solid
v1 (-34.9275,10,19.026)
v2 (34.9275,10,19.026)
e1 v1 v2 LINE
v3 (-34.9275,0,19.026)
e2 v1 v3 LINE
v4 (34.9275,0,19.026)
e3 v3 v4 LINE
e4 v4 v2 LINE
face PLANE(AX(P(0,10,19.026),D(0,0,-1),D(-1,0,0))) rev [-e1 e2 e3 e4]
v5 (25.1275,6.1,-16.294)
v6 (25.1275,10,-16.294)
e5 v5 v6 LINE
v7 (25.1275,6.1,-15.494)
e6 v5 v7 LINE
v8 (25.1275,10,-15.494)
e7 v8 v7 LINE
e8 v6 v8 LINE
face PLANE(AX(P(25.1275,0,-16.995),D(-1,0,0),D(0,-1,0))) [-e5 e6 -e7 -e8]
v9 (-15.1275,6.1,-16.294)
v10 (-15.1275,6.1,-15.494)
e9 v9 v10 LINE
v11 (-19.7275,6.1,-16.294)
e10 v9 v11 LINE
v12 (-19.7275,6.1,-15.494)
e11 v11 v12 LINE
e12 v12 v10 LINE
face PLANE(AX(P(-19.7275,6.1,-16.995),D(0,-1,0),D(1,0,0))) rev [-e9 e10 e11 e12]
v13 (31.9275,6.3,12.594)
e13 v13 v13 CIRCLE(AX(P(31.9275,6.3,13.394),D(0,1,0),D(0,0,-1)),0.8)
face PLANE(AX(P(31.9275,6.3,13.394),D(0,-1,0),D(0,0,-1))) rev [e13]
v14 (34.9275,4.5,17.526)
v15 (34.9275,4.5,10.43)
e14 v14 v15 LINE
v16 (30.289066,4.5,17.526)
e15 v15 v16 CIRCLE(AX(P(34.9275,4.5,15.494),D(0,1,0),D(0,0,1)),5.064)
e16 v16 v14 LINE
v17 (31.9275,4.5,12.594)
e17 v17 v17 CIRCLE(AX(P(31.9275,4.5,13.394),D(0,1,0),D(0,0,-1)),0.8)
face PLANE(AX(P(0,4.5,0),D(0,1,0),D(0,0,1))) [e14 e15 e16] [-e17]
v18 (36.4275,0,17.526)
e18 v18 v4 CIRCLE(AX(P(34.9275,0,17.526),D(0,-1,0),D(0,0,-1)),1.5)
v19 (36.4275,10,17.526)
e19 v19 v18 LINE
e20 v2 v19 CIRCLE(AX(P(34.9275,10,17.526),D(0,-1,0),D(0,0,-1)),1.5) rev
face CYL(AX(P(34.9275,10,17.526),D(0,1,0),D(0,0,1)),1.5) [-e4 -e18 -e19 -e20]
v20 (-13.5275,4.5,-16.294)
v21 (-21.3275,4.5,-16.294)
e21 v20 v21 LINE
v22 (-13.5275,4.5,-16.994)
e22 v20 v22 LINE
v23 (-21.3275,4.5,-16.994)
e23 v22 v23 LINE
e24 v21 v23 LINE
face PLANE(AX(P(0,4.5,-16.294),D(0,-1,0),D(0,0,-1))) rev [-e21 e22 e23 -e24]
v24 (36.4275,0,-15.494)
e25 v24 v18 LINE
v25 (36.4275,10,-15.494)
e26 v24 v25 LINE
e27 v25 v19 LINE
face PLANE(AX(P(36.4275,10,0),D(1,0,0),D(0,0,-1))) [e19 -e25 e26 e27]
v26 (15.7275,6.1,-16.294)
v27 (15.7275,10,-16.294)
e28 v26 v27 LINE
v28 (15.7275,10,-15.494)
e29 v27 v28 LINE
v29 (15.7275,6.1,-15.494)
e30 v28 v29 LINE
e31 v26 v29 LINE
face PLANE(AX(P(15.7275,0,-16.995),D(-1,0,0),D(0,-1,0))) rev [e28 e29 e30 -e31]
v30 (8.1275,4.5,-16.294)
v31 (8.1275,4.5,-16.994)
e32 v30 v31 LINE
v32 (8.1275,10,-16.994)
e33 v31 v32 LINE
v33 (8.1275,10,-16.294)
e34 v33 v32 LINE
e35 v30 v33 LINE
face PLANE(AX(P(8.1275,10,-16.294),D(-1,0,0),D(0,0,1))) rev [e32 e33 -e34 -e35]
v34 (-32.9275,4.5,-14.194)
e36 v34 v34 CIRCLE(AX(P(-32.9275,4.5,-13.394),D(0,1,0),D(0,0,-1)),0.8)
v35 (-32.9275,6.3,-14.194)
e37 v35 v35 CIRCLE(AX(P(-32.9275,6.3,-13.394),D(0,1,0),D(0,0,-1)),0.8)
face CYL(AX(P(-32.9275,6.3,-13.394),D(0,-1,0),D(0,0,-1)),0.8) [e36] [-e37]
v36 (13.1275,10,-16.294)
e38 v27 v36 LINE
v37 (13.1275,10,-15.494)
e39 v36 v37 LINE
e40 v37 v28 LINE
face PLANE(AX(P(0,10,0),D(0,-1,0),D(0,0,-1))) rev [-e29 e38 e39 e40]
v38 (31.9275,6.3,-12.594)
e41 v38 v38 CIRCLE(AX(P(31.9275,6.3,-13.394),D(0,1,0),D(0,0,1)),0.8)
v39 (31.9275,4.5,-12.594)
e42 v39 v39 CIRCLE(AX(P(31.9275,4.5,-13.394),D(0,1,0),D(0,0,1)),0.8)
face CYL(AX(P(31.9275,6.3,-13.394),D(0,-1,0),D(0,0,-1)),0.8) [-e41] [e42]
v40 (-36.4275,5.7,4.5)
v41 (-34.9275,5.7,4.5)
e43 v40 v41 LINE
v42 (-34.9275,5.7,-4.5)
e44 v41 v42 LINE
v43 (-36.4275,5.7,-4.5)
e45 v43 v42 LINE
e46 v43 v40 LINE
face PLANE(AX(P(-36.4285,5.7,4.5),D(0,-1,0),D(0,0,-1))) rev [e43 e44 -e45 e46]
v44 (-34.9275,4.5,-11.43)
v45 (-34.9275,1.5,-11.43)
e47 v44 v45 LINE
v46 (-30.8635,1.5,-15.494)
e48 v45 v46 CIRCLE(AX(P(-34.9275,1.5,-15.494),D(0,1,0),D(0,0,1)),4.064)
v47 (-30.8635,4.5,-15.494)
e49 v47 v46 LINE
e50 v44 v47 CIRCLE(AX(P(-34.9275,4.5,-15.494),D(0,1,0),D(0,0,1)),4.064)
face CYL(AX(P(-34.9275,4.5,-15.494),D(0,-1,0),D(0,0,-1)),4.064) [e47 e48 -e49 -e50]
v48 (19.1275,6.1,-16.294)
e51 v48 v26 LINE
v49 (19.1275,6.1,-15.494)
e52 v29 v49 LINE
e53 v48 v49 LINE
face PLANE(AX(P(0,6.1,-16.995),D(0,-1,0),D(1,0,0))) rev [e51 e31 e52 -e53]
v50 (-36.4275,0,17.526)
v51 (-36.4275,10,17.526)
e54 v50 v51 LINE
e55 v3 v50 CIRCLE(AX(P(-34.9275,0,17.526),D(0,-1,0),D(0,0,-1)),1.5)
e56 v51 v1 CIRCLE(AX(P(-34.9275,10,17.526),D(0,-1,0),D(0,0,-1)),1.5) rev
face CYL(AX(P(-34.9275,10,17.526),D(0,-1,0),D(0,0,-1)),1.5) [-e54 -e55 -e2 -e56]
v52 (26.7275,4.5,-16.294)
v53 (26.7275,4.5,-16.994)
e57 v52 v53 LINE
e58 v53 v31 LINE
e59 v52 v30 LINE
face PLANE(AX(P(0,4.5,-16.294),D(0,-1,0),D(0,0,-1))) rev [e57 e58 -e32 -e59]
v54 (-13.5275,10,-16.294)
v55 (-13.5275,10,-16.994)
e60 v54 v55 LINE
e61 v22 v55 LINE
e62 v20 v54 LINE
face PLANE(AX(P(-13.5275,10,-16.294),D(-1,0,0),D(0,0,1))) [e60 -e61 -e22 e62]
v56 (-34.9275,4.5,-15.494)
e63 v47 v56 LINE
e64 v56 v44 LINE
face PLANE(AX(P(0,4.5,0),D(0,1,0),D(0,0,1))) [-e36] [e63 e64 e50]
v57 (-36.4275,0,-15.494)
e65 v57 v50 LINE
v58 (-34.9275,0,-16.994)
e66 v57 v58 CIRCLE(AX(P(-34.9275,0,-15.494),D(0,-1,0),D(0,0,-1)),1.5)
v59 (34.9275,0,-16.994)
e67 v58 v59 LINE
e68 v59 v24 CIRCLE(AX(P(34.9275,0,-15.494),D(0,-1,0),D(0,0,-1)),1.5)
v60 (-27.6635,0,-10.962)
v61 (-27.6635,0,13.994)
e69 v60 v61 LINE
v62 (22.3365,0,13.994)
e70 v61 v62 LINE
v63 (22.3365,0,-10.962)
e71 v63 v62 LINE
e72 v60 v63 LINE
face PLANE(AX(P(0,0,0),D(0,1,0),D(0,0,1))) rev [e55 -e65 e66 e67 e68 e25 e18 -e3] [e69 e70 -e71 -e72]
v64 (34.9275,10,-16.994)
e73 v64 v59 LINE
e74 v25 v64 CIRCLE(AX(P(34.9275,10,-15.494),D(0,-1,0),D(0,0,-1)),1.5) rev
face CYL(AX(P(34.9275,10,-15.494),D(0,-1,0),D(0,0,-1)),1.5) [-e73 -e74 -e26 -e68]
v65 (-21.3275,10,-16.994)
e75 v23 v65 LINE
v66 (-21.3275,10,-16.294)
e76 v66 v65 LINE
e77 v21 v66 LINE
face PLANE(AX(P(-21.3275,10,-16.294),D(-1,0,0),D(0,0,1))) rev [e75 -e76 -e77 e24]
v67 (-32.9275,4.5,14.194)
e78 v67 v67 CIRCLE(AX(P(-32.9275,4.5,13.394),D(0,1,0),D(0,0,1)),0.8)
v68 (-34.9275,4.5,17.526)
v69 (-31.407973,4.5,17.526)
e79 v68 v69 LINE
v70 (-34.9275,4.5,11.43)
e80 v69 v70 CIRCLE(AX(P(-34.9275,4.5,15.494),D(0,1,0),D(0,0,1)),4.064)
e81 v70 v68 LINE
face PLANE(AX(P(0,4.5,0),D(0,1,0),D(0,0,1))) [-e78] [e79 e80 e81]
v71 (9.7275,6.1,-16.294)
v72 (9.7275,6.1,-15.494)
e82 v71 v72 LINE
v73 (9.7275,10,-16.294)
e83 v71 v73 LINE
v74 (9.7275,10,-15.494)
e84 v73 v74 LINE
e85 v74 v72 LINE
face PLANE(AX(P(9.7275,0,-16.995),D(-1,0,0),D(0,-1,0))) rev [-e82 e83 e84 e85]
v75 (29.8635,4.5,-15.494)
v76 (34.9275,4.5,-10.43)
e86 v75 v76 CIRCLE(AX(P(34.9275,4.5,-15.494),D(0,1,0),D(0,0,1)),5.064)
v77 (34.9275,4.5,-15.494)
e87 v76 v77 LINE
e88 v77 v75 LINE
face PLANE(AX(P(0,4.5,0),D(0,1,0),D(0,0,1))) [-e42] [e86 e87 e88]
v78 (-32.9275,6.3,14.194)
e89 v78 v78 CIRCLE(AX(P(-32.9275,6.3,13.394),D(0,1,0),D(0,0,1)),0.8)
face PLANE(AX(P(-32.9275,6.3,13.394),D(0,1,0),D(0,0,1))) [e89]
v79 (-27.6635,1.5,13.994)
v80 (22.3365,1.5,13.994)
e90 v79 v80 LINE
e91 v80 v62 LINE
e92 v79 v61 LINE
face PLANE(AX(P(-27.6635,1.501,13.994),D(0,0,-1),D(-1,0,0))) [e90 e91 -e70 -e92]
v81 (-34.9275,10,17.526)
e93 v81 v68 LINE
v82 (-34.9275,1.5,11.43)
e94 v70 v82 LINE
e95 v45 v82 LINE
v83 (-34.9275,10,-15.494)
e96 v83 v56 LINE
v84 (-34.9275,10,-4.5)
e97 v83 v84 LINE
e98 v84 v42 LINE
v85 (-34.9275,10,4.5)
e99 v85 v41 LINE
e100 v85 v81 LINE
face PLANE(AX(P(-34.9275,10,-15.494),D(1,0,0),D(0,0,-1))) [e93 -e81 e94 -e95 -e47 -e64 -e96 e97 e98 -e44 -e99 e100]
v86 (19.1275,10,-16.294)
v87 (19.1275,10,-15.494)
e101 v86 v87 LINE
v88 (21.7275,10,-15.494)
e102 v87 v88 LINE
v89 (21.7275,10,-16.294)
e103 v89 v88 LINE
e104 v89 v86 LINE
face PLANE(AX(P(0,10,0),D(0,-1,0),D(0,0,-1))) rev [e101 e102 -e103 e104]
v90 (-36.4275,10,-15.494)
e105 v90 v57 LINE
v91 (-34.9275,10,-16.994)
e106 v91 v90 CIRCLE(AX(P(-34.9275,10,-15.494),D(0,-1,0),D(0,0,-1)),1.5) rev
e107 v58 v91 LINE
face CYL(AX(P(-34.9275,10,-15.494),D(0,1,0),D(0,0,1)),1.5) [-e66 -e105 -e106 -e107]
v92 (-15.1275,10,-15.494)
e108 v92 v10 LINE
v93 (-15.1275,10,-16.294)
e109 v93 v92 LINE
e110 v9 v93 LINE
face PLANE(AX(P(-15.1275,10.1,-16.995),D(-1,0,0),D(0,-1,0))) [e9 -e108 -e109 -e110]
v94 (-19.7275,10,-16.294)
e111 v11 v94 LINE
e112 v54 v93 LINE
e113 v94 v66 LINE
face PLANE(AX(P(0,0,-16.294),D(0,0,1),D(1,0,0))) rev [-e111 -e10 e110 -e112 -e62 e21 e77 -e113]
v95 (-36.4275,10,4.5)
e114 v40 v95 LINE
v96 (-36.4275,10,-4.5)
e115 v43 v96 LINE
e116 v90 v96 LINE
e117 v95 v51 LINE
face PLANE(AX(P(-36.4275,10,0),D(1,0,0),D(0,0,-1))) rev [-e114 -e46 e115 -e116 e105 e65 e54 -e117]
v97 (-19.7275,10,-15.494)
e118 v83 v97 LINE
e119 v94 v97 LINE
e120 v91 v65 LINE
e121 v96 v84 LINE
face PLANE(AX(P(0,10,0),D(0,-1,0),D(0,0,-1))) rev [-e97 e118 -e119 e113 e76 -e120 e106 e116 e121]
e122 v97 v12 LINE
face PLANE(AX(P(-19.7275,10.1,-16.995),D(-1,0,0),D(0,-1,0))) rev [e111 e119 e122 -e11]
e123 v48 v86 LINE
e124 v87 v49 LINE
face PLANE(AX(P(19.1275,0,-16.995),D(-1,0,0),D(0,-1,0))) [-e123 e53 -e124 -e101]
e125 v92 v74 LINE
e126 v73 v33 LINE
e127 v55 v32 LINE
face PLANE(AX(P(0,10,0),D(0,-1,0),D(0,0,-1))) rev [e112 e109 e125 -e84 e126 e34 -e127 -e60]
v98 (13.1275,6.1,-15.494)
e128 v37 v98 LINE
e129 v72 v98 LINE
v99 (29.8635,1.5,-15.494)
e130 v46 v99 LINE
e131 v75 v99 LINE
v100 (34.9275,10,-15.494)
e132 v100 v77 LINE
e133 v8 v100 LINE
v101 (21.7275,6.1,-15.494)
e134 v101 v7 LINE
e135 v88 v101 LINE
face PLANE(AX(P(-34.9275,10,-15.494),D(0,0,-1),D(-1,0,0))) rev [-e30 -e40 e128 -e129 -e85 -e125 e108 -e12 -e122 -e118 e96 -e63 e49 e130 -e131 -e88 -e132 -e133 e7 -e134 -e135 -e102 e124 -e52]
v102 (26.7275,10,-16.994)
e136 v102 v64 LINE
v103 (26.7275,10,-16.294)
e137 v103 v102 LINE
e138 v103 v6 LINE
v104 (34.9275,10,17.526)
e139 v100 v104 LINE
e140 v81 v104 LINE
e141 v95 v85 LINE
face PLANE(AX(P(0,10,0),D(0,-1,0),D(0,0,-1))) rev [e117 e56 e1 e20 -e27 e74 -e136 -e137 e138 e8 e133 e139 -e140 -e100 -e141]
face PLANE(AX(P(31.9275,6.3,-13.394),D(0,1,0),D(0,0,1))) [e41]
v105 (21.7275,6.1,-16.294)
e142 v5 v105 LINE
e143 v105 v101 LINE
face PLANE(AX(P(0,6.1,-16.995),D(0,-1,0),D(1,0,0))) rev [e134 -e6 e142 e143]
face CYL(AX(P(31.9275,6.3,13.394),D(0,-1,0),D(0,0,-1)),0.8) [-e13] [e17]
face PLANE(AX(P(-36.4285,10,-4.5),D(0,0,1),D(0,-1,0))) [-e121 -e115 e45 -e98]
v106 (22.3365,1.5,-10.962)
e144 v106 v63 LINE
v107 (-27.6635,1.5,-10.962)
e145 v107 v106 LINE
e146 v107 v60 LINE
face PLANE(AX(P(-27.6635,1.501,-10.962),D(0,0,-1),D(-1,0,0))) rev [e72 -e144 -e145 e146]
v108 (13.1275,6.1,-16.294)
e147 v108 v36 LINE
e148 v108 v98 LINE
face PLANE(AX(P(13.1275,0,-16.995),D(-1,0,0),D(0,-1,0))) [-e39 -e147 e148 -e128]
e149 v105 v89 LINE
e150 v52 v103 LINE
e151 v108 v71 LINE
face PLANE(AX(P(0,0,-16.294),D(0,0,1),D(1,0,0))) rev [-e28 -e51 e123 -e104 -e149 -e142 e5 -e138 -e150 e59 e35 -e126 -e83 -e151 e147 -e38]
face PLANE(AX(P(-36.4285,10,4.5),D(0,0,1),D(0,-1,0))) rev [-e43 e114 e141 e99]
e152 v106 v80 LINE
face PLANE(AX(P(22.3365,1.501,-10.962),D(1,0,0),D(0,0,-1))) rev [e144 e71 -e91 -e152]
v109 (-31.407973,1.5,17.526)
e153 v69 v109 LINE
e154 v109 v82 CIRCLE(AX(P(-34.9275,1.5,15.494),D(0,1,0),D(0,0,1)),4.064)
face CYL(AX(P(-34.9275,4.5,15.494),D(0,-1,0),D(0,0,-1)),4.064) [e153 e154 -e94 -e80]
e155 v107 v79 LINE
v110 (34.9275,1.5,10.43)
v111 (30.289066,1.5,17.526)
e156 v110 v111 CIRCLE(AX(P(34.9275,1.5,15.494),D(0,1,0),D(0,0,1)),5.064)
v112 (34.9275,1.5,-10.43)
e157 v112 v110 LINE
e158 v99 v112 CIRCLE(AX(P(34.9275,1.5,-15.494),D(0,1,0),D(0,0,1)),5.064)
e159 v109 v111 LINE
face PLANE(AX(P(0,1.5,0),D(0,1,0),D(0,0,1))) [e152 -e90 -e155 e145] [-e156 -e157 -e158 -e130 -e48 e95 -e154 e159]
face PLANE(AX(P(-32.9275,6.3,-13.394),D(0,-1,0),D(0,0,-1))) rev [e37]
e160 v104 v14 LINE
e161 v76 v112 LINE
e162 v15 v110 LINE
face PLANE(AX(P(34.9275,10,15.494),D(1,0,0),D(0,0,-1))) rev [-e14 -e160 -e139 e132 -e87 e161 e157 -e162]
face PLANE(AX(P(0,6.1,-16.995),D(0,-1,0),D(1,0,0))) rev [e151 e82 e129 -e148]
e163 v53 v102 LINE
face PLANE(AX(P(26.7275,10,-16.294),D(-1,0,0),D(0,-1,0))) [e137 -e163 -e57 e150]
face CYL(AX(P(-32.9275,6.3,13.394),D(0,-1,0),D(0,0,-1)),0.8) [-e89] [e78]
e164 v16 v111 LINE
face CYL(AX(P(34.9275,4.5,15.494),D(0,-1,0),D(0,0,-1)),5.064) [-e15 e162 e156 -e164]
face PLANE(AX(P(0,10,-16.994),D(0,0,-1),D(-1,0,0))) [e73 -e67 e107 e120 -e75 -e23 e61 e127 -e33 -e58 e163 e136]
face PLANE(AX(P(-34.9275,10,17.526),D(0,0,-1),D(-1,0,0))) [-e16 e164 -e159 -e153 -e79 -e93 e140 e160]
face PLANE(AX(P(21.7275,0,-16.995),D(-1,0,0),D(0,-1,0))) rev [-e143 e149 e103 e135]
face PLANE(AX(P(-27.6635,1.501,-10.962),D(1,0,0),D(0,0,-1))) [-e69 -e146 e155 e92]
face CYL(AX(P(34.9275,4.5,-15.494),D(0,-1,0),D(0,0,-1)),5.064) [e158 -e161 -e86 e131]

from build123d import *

# Parameters (mm, degrees)
EXTRUDE_1_DEPTH         = 1.5
CUT_EXTRUDE_2_REACH     = 41.107
SKETCH_1_6_W            = 50
SKETCH_1_6_H            = 24.956
EXTRUDE_1_2_OUTLINE_W   = 72.855
EXTRUDE_1_2_OUTLINE_H   = 36.02
EXTRUDE_1_2_OUTLINE_W_2 = 69.855
EXTRUDE_1_2_OUTLINE_H_2 = 33.02
EXTRUDE_1_2_DEPTH       = 10
FILLET_1_R              = 1.5
EXTRUDE_2_DEPTH         = 3
SKETCH_3_R              = 0.8
EXTRUDE_3_DEPTH         = 1.8
CUT_EXTRUDE_3_REACH     = 76.522
SKETCH_4_W              = 9
SKETCH_4_H              = 4.3
CUT_EXTRUDE_4_REACH     = 53.172
SKETCH_5_W              = 3.4
SKETCH_5_H              = 4
SKETCH_5_W_2            = 4.6
CUT_EXTRUDE_START       = -1.5
SKETCH_5_6_W            = 7.8
SKETCH_5_6_H            = 7.2
SKETCH_5_6_W_2          = 18.6
CUT_EXTRUDE_6_DEPTH     = 0.7


# Read off the part's stored shape, not the designer's step: 拉伸-薄壁1
with BuildPart() as part:
    # 草图1 → Extrude 1 (new body)
    with BuildSketch(Plane(origin=(0, 0, 0), x_dir=(1, 0, 0), z_dir=(0, 1, 0))):
        Polygon((-34.9275, 15.494), (34.9275, 15.494), (34.9275, -15.494), (34.9275, -17.526), (-34.9275, -17.526), (-34.9275, -15.494), align=None)
    extrude(amount=EXTRUDE_1_DEPTH)

    # 草图1<6> → 切除-拉伸2 (cut, up to next)
    with BuildSketch(Plane(origin=(0, 0, 0), x_dir=(1, 0, 0), z_dir=(0, 1, 0)), mode=Mode.PRIVATE) as cut_extrude_2_sk1:
        with Locations((-2.6635, -1.516)):
            Rectangle(SKETCH_1_6_W, SKETCH_1_6_H)
    cut_extrude_2_tool1 = extrude(cut_extrude_2_sk1.sketch, amount=CUT_EXTRUDE_2_REACH, mode=Mode.PRIVATE) & part.part
    add(cut_extrude_2_tool1.solids().sort_by_distance((-2.6635, 0, 1.516))[0], mode=Mode.SUBTRACT)



with BuildPart() as body_2:
    # Extrude 1 2 outline → Extrude 1 2 (new body)
    with BuildSketch(Plane(origin=(0, 0, 0), x_dir=(1, 0, 0), z_dir=(0, 1, 0))):
        with Locations((0, -1.016)):
            Rectangle(EXTRUDE_1_2_OUTLINE_W, EXTRUDE_1_2_OUTLINE_H)
        with Locations((0, -1.016)):
            Rectangle(EXTRUDE_1_2_OUTLINE_W_2, EXTRUDE_1_2_OUTLINE_H_2, mode=Mode.SUBTRACT)
    extrude(amount=EXTRUDE_1_2_DEPTH)

    # 圆角1
    fillet_1_edges = [body_2.edges().sort_by_distance(p)[0] for p in [
        (-36.4275, 5, -16.994),
        (-36.4275, 5, 19.026),
        (36.4275, 5, 19.026),
        (36.4275, 5, -16.994),
    ]]
    fillet(fillet_1_edges, radius=FILLET_1_R)


with BuildPart() as part_1:
    add(part.part)

    add(body_2.part)  # 凸台-拉伸2 merges body 2
    # 草图2 → 凸台-拉伸2 (add)
    with BuildSketch(Plane(origin=(0, 1.5, 0), x_dir=(1, 0, 0), z_dir=(0, 1, 0))):
        with BuildLine():
            ThreePointArc((-31.407972759, -17.526), (-31.407972759, -13.462), (-34.9275, -11.43))
            Line((-34.9275, -11.43), (-34.9275, -17.526))
            Line((-34.9275, -17.526), (-31.407972759, -17.526))
        make_face()
        with BuildLine():
            ThreePointArc((-34.9275, 11.43), (-32.053818041, 12.620318041), (-30.8635, 15.494))
            Line((-30.8635, 15.494), (-34.9275, 15.494))
            Line((-34.9275, 15.494), (-34.9275, 11.43))
        make_face()
        with BuildLine():
            Line((34.9275, 15.494), (29.8635, 15.494))
            ThreePointArc((29.8635, 15.494), (31.34671126, 11.91321126), (34.9275, 10.43))
            Line((34.9275, 10.43), (34.9275, 15.494))
        make_face()
        with BuildLine():
            Line((34.9275, -17.526), (34.9275, -10.43))
            ThreePointArc((34.9275, -10.43), (30.688741691, -12.723255696), (30.289065781, -17.526))
            Line((30.289065781, -17.526), (34.9275, -17.526))
        make_face()
    extrude(amount=EXTRUDE_2_DEPTH)

    # 草图3 → 凸台-拉伸3 (add)
    with BuildSketch(Plane(origin=(0, 4.5, 0), x_dir=(1, 0, 0), z_dir=(0, 1, 0))):
        with Locations(Location((-32.9275, -13.394, 0), (0, 0, 270))):
            Circle(SKETCH_3_R)
        with Locations(Location((-32.9275, 13.394, 0), (0, 0, 90))):
            Circle(SKETCH_3_R)
        with Locations(Location((31.9275, -13.394, 0), (0, 0, 90))):
            Circle(SKETCH_3_R)
        with Locations(Location((31.9275, 13.394, 0), (0, 0, 270))):
            Circle(SKETCH_3_R)
    extrude(amount=EXTRUDE_3_DEPTH)

    # 草图4 → 切除-拉伸3 (cut, up to next)
    with BuildSketch(Plane(origin=(-34.9275, 0, 0), x_dir=(0, 0, -1), z_dir=(1, 0, 0)), mode=Mode.PRIVATE) as cut_extrude_3_sk1:
        with Locations((0, 7.85)):
            Rectangle(SKETCH_4_W, SKETCH_4_H)
    cut_extrude_3_tool1 = extrude(cut_extrude_3_sk1.sketch, amount=-CUT_EXTRUDE_3_REACH, mode=Mode.PRIVATE) & part_1.part
    add(cut_extrude_3_tool1.solids().sort_by_distance((-34.9275, 7.85, 0))[0], mode=Mode.SUBTRACT)

    # 草图5 → 切除-拉伸4 (cut, up to next)
    with BuildSketch(Plane.XY.offset(-15.494), mode=Mode.PRIVATE) as cut_extrude_4_sk1:
        with Locations((11.4275, 8.1)):
            Rectangle(SKETCH_5_W, SKETCH_5_H)
    cut_extrude_4_tool1 = extrude(cut_extrude_4_sk1.sketch, amount=-CUT_EXTRUDE_4_REACH, mode=Mode.PRIVATE) & part_1.part
    # 草图5 → 切除-拉伸4 (cut, up to next)
    with BuildSketch(Plane.XY.offset(-15.494), mode=Mode.PRIVATE) as cut_extrude_4_sk2:
        with Locations((17.4275, 8.1)):
            Rectangle(SKETCH_5_W, SKETCH_5_H)
    cut_extrude_4_tool2 = extrude(cut_extrude_4_sk2.sketch, amount=-CUT_EXTRUDE_4_REACH, mode=Mode.PRIVATE) & part_1.part
    # 草图5 → 切除-拉伸4 (cut, up to next)
    with BuildSketch(Plane.XY.offset(-15.494), mode=Mode.PRIVATE) as cut_extrude_4_sk3:
        with Locations((23.4275, 8.1)):
            Rectangle(SKETCH_5_W, SKETCH_5_H)
    cut_extrude_4_tool3 = extrude(cut_extrude_4_sk3.sketch, amount=-CUT_EXTRUDE_4_REACH, mode=Mode.PRIVATE) & part_1.part
    # 草图5 → 切除-拉伸4 (cut, up to next)
    with BuildSketch(Plane.XY.offset(-15.494), mode=Mode.PRIVATE) as cut_extrude_4_sk4:
        with Locations((-17.4275, 8.1)):
            Rectangle(SKETCH_5_W_2, SKETCH_5_H)
    cut_extrude_4_tool4 = extrude(cut_extrude_4_sk4.sketch, amount=-CUT_EXTRUDE_4_REACH, mode=Mode.PRIVATE) & part_1.part
    add(cut_extrude_4_tool1.solids().sort_by_distance((11.4275, 8.1, -15.494))[0], mode=Mode.SUBTRACT)
    add(cut_extrude_4_tool2.solids().sort_by_distance((17.4275, 8.1, -15.494))[0], mode=Mode.SUBTRACT)
    add(cut_extrude_4_tool3.solids().sort_by_distance((23.4275, 8.1, -15.494))[0], mode=Mode.SUBTRACT)
    add(cut_extrude_4_tool4.solids().sort_by_distance((-17.4275, 8.1, -15.494))[0], mode=Mode.SUBTRACT)

    # 草图5<6> → 切除-拉伸6 (cut)
    with BuildSketch(Plane.XY.offset(-15.494).offset(CUT_EXTRUDE_START)):
        with Locations((-17.4275, 8.1)):
            Rectangle(SKETCH_5_6_W, SKETCH_5_6_H)
        with Locations((17.4275, 8.1)):
            Rectangle(SKETCH_5_6_W_2, SKETCH_5_6_H)
    extrude(amount=CUT_EXTRUDE_6_DEPTH, mode=Mode.SUBTRACT)


solid = part_1.part
